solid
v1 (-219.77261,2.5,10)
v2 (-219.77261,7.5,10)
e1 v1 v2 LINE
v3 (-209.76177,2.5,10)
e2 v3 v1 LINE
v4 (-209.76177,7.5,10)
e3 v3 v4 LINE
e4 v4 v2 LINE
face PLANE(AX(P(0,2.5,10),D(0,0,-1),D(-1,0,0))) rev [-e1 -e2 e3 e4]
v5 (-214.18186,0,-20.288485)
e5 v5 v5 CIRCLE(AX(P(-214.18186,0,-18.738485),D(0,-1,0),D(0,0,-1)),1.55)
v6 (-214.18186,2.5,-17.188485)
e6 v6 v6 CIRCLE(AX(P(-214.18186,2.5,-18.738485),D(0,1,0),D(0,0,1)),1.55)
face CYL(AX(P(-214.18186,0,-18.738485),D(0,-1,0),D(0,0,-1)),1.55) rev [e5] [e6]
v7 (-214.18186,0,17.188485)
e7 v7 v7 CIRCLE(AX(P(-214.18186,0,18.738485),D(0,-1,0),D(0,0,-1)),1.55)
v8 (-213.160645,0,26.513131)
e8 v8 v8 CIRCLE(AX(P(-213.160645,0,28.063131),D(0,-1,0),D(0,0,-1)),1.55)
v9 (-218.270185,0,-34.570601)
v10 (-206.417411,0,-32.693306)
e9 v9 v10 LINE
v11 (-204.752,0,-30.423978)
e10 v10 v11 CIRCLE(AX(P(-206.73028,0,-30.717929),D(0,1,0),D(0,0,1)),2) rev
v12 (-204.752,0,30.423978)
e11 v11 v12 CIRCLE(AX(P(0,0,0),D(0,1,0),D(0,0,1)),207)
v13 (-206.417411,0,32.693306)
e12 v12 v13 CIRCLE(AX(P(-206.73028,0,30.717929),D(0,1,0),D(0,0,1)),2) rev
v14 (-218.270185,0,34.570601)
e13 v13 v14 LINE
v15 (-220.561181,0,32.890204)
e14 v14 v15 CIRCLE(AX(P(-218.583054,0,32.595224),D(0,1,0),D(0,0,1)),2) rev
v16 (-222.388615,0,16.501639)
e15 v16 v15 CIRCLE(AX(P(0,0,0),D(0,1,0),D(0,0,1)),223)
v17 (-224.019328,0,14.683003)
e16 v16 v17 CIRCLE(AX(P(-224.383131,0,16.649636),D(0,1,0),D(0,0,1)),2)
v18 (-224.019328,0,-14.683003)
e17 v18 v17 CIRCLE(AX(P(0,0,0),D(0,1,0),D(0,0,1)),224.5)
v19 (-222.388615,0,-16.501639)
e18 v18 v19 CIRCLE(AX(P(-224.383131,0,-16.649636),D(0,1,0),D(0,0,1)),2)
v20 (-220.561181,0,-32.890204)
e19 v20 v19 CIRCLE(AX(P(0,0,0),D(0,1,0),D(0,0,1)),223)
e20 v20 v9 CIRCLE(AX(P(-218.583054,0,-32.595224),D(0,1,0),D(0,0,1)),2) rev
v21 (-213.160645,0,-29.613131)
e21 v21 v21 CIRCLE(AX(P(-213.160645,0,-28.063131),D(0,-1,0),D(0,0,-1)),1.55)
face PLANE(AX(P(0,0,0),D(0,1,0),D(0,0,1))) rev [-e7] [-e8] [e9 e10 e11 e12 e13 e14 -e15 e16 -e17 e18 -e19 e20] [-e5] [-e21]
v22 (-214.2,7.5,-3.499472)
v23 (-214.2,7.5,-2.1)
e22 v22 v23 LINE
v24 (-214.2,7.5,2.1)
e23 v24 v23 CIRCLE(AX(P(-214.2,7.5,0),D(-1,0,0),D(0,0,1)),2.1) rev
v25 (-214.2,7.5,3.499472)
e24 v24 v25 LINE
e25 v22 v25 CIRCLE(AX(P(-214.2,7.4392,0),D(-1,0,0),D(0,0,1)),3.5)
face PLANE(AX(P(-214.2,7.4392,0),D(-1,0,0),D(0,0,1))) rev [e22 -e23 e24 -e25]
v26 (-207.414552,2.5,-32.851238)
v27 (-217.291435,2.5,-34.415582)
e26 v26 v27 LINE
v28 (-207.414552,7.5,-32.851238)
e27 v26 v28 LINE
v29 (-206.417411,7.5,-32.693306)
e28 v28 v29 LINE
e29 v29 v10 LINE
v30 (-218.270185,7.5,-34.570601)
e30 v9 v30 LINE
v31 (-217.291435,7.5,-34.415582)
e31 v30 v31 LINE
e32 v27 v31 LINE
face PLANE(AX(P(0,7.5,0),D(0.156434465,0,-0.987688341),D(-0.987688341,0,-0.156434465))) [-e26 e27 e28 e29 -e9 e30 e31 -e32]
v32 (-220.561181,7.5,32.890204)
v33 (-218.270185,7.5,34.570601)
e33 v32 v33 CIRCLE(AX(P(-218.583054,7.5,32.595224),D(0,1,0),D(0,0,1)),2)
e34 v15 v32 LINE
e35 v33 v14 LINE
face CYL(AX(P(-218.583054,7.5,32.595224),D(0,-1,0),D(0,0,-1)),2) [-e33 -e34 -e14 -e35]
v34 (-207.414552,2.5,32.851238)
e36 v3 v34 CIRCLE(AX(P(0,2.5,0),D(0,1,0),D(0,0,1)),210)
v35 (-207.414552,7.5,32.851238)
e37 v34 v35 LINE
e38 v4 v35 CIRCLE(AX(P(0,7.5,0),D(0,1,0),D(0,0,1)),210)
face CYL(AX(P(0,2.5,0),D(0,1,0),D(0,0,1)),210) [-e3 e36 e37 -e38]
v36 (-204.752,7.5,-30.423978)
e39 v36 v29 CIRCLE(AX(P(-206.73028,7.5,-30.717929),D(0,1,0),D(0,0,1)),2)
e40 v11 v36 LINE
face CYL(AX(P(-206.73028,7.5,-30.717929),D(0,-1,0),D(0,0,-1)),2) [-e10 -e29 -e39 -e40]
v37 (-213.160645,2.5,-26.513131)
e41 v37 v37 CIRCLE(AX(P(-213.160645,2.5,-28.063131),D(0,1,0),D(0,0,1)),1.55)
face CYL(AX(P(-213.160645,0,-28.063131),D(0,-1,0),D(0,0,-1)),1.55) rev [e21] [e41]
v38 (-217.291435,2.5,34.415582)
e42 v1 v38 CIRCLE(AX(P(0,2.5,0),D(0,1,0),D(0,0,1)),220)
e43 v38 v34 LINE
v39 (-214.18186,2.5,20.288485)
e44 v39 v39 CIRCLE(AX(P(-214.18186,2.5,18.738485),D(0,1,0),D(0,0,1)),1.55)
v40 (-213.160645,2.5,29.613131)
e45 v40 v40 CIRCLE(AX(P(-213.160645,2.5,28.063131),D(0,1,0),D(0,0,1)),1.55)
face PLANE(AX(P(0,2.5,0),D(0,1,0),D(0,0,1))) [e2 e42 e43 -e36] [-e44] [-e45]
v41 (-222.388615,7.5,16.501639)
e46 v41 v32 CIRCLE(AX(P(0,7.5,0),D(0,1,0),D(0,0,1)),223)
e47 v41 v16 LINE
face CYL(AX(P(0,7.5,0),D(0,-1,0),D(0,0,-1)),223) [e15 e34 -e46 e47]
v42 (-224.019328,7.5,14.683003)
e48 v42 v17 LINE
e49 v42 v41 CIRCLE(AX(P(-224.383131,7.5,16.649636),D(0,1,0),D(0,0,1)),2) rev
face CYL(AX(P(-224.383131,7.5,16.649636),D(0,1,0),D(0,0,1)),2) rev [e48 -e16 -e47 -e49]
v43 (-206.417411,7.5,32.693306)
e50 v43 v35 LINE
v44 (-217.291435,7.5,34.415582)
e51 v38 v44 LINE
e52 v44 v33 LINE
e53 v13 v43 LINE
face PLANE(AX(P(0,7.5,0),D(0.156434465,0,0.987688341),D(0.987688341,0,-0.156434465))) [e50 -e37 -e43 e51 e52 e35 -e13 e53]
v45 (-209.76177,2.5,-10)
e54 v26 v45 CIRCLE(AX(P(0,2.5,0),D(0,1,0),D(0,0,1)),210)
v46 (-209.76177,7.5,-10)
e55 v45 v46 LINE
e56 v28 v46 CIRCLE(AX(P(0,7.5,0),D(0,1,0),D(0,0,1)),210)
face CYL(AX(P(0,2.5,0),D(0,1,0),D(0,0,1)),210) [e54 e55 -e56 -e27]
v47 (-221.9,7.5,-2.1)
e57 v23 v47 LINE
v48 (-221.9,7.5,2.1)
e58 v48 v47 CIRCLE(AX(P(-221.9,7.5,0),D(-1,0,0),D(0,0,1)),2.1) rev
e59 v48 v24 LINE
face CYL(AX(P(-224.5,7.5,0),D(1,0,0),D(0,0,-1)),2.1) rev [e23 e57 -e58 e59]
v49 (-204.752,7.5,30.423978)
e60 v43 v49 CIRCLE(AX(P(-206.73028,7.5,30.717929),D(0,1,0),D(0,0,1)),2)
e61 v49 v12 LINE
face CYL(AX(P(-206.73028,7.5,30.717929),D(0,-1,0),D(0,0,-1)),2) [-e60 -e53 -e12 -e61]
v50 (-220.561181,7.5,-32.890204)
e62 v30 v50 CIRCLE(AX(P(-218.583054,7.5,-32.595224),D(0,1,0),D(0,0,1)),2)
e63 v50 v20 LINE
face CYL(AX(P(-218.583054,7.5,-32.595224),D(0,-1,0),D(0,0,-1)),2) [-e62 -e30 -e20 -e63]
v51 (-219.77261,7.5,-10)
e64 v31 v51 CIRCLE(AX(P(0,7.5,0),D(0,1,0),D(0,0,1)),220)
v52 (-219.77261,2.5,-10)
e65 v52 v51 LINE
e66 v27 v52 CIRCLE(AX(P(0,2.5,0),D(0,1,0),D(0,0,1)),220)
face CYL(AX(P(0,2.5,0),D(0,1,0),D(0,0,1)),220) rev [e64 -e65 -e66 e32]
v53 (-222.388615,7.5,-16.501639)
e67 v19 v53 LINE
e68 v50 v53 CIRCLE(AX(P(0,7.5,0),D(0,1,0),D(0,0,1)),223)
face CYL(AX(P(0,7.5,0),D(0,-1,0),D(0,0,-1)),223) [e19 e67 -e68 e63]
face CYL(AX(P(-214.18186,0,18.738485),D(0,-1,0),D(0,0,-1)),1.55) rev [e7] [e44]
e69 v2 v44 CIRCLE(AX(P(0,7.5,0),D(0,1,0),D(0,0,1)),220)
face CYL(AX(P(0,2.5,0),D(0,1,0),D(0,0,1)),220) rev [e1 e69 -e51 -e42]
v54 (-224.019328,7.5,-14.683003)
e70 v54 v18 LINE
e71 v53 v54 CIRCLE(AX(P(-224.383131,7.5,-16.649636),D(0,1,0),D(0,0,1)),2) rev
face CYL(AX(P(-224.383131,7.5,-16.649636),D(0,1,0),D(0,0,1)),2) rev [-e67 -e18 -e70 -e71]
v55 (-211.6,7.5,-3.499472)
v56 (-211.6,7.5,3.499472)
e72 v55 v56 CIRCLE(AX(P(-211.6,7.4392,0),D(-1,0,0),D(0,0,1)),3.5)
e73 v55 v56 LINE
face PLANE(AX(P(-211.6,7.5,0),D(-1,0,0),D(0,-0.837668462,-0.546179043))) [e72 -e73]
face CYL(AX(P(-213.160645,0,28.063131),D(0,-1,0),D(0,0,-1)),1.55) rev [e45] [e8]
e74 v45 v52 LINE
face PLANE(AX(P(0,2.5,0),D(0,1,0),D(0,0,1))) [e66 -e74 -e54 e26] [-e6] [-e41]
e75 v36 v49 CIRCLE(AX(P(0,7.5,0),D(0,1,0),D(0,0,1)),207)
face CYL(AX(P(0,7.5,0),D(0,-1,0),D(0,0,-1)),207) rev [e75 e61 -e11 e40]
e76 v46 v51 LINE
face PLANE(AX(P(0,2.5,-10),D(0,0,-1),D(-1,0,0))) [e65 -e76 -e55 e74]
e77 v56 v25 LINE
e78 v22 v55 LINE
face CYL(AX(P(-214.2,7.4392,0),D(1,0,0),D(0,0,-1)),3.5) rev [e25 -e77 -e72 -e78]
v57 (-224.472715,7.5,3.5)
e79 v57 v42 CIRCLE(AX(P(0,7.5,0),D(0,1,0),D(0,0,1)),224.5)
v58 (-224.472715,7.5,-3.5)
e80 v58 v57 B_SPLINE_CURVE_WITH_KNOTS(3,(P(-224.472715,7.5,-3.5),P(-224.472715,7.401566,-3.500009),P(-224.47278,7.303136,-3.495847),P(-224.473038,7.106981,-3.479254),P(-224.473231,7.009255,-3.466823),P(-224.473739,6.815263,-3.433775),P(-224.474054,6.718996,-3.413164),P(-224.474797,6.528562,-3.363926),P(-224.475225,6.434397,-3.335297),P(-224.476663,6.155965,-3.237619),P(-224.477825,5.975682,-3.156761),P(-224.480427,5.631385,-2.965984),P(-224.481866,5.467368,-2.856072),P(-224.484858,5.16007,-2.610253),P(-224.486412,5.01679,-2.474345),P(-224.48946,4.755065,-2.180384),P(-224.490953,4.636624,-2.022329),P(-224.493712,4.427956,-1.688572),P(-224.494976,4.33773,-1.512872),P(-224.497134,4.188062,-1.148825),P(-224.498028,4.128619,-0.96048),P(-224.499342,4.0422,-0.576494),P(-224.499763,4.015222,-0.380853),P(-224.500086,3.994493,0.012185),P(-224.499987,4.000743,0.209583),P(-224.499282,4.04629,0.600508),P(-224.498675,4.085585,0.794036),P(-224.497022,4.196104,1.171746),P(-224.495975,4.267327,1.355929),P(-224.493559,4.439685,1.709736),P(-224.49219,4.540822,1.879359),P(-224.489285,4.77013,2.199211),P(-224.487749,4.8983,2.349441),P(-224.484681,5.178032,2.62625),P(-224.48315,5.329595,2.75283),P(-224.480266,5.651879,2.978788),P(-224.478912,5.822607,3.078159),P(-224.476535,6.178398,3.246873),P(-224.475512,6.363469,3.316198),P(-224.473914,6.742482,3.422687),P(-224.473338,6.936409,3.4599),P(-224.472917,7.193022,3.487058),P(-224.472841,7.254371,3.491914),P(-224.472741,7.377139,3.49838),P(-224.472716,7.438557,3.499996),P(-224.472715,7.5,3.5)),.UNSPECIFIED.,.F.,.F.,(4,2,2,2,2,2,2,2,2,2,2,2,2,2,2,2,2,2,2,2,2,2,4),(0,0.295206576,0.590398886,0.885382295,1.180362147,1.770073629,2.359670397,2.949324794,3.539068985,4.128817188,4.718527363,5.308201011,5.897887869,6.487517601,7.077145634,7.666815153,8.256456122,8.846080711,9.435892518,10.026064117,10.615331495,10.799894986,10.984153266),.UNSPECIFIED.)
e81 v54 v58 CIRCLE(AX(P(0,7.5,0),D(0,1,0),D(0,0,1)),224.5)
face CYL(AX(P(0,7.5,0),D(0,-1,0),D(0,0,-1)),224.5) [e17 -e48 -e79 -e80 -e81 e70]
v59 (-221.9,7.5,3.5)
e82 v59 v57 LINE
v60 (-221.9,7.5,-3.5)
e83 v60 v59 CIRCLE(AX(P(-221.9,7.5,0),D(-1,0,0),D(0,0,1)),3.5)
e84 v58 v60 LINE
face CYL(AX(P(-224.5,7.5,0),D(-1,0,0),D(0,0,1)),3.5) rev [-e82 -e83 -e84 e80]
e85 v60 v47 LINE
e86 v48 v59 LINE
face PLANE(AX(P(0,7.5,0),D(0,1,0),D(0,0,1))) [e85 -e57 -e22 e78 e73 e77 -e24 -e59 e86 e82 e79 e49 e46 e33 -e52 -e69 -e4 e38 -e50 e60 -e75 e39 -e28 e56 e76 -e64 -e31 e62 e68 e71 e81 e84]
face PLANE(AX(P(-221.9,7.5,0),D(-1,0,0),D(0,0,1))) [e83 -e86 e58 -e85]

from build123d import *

# Parameters (mm, degrees)
BOSS_EXTRUDE1_DEPTH            = 7.5
BOSS_EXTRUDE2_DEPTH            = 7.5
CUT_EXTRUDE1_DEPTH             = 5
F_3_1_3_1_DIAMETER_HOLE2_D     = 3.1
FILLET1_R                      = 2
FILLET2_R                      = 2
CUT_EXTRUDE2_REACH             = 39.378
CUT_EXTRUDE2_END_RADIUS        = 224.5
SKETCH22_R                     = 2.1
CUT_EXTRUDE2_DIRECTION_2_DEPTH = 0.9
SKETCH23_R                     = 3.5
CUT_EXTRUDE3_DEPTH             = 2.6
SKETCH24_W                     = 2.6
SKETCH24_H                     = 3.5


with BuildPart() as part:
    # Sketch1 → Boss-Extrude1 (new body)
    with BuildSketch(Plane(origin=(0, 0, 0), x_dir=(1, 0, 0), z_dir=(0, 1, 0))):
        with BuildLine():
            ThreePointArc((-207.414551525, 32.851237658), (-210, 0), (-207.414551525, -32.851237658))
            Line((-207.414551525, -32.851237658), (-217.291434931, -34.415582309))
            ThreePointArc((-217.291434931, -34.415582309), (-220, 0), (-217.291434931, 34.415582309))
            Line((-217.291434931, 34.415582309), (-207.414551525, 32.851237658))
        make_face()
        with BuildLine():
            ThreePointArc((-217.291434931, -34.415582309), (-220, 0), (-217.291434931, 34.415582309))
            Line((-217.291434931, 34.415582309), (-220.254499953, 34.884885704))
            ThreePointArc((-220.254499953, 34.884885704), (-223, 0), (-220.254499953, -34.884885704))
            Line((-220.254499953, -34.884885704), (-217.291434931, -34.415582309))
        make_face()
        with BuildLine():
            Line((-204.451486503, 32.381934263), (-207.414551525, 32.851237658))
            ThreePointArc((-207.414551525, 32.851237658), (-210, 0), (-207.414551525, -32.851237658))
            Line((-207.414551525, -32.851237658), (-204.451486503, -32.381934263))
            ThreePointArc((-204.451486503, -32.381934263), (-207, 0), (-204.451486503, 32.381934263))
        make_face()
    extrude(amount=BOSS_EXTRUDE1_DEPTH)

    # Sketch19 → Boss-Extrude2 (add)
    with BuildSketch(Plane(origin=(0, 0, 0), x_dir=(1, 0, 0), z_dir=(0, 1, 0))):
        with BuildLine():
            Line((-224.019328267, 14.683002512), (-222.522539882, 14.584897818))
            ThreePointArc((-222.522539882, 14.584897818), (-223, 0), (-222.522539882, -14.584897818))
            Line((-222.522539882, -14.584897818), (-224.019328267, -14.683002512))
            ThreePointArc((-224.019328267, -14.683002512), (-224.5, 0), (-224.019328267, 14.683002512))
        make_face()
    extrude(amount=BOSS_EXTRUDE2_DEPTH)

    # Sketch15 → Cut-Extrude1 (cut)
    with BuildSketch(Plane(origin=(0, 7.5, 0), x_dir=(1, 0, 0), z_dir=(0, 1, 0))):
        with BuildLine():
            Line((-219.772609758, 10), (-209.761769634, 10))
            ThreePointArc((-209.761769634, 10), (-208.900850883, 21.457737542), (-207.414551525, 32.851237658))
            Line((-207.414551525, 32.851237658), (-217.291434931, 34.415582309))
            ThreePointArc((-217.291434931, 34.415582309), (-218.872736893, 22.242415451), (-219.772609758, 10))
        make_face()
        with BuildLine():
            ThreePointArc((-207.414551525, -32.851237658), (-208.900850883, -21.457737542), (-209.761769634, -10))
            Line((-209.761769634, -10), (-219.772609758, -10))
            ThreePointArc((-219.772609758, -10), (-218.872736893, -22.242415451), (-217.291434931, -34.415582309))
            Line((-217.291434931, -34.415582309), (-207.414551525, -32.851237658))
        make_face()
    extrude(amount=-CUT_EXTRUDE1_DEPTH, mode=Mode.SUBTRACT)

    # Ø3.1 (3.1) Diameter Hole2 (through all)
    with Locations(Plane(origin=(0, 0, 0), x_dir=(-1, 0, 0), z_dir=(0, -1, 0))):
        with Locations((213.160645195, -28.063131327), (214.18186009, -18.738484691), (214.18186009, 18.738484691), (213.160645195, 28.063131327)):
            Hole(F_3_1_3_1_DIAMETER_HOLE2_D / 2)

    # Fillet1
    fillet1_edges = [part.edges().sort_by_distance(p)[0] for p in [
        (-220.254499953, 3.75, 34.884885704),
        (-220.254499953, 3.75, -34.884885704),
        (-204.451486503, 3.75, -32.381934263),
        (-204.451486503, 3.75, 32.381934263),
    ]]
    fillet(fillet1_edges, radius=FILLET1_R)

    # Fillet2
    # the kernel refuses this fillet: 2 mm, written as the material it adds along each edge
    with BuildSketch(Plane(origin=(-222.522539882, 0, -14.584897818), x_dir=(0.06970140258603677, 0, -0.9975678996827931), z_dir=(0, 1, 0))) as fillet2_piece_1:
        with BuildLine():
            CenterArc((1.930030715, 1.99998144), FILLET2_R, 194.477374901, 75.275788142)
            Line((-0.006462156, 1.49998608), (-0.045192014, 1.489986173))
            ThreePointArc((-0.045192014, 1.489986173), (-0.043230707, 0.749820716), (-0.039999629, -0.000172324))
            Line((-0.039999629, -0.000172324), (0.000172324, -0.039999629))
            ThreePointArc((0.000172324, -0.039999629), (0.960707253, -0.037930577), (1.921242182, -0.039999629))
            Line((1.921242182, -0.039999629), (1.921414506, 0))
        make_face()
    extrude(amount=7.5)
    with BuildSketch(Plane(origin=(-222.522539882, 0, 14.584897818), x_dir=(-0.9978589232386029, 0, 0.06540312923015226), z_dir=(0, 1, 0))) as fillet2_piece_2:
        with BuildLine():
            CenterArc((1.991648107, 1.938628933), FILLET2_R, 180.493673912, 75.275788142)
            Line((-0.008277654, 1.921396676), (-0.048276169, 1.92105203))
            ThreePointArc((-0.048276169, 1.92105203), (-0.042069052, 0.960534929), (-0.04, 0))
            Line((-0.04, 0), (0, -0.04))
            ThreePointArc((0, -0.04), (0.75, -0.04), (1.490167038, -0.038772579))
            Line((1.490167038, -0.038772579), (1.5, 0))
        make_face()
    extrude(amount=7.5)

    # Cut-Extrude2: up to this cylinder (the profile starts inside it)
    cut_extrude2_end = Plane(origin=(0, 7.5, 0), z_dir=(0, -1, 0)) * Cylinder(CUT_EXTRUDE2_END_RADIUS, 528.756, mode=Mode.PRIVATE)
    # Sketch22 → Cut-Extrude2 (cut, up to the surface)
    with BuildSketch(Plane(origin=(-212.5, 0, 0), x_dir=(0, 0, -1), z_dir=(1, 0, 0)), mode=Mode.PRIVATE) as cut_extrude2_sk1:
        with Locations((0, 7.5)):
            Circle(SKETCH22_R)
    cut_extrude2_tool1 = extrude(cut_extrude2_sk1.sketch, amount=-CUT_EXTRUDE2_REACH, mode=Mode.PRIVATE) & cut_extrude2_end
    add(cut_extrude2_tool1.solids().sort_by_distance((-212.5, 7.5, 0))[0], mode=Mode.SUBTRACT)

    # Sketch22 → Cut-Extrude2 direction 2 (cut)
    with BuildSketch(Plane(origin=(-212.5, 0, 0), x_dir=(0, 0, -1), z_dir=(1, 0, 0))):
        with Locations((0, 7.5)):
            Circle(SKETCH22_R)
    extrude(amount=CUT_EXTRUDE2_DIRECTION_2_DEPTH, mode=Mode.SUBTRACT)

    # Sketch23 → Cut-Extrude3 (cut)
    with BuildSketch(Plane.ZY.offset(211.6)):
        with Locations((0, 7.439199918)):
            Circle(SKETCH23_R)
    extrude(amount=CUT_EXTRUDE3_DEPTH, mode=Mode.SUBTRACT)

    # Sketch24 → Cut-Revolve1 (revolve, cut)
    with BuildSketch(Plane(origin=(0, 7.5, 0), x_dir=(1, 0, 0), z_dir=(0, 1, 0))):
        with Locations((-223.2, 1.75)):
            Rectangle(SKETCH24_W, SKETCH24_H)
    revolve(axis=Axis((-224.5, 7.5, 0), (1, 0, 0)), mode=Mode.SUBTRACT)


solid = part.part
